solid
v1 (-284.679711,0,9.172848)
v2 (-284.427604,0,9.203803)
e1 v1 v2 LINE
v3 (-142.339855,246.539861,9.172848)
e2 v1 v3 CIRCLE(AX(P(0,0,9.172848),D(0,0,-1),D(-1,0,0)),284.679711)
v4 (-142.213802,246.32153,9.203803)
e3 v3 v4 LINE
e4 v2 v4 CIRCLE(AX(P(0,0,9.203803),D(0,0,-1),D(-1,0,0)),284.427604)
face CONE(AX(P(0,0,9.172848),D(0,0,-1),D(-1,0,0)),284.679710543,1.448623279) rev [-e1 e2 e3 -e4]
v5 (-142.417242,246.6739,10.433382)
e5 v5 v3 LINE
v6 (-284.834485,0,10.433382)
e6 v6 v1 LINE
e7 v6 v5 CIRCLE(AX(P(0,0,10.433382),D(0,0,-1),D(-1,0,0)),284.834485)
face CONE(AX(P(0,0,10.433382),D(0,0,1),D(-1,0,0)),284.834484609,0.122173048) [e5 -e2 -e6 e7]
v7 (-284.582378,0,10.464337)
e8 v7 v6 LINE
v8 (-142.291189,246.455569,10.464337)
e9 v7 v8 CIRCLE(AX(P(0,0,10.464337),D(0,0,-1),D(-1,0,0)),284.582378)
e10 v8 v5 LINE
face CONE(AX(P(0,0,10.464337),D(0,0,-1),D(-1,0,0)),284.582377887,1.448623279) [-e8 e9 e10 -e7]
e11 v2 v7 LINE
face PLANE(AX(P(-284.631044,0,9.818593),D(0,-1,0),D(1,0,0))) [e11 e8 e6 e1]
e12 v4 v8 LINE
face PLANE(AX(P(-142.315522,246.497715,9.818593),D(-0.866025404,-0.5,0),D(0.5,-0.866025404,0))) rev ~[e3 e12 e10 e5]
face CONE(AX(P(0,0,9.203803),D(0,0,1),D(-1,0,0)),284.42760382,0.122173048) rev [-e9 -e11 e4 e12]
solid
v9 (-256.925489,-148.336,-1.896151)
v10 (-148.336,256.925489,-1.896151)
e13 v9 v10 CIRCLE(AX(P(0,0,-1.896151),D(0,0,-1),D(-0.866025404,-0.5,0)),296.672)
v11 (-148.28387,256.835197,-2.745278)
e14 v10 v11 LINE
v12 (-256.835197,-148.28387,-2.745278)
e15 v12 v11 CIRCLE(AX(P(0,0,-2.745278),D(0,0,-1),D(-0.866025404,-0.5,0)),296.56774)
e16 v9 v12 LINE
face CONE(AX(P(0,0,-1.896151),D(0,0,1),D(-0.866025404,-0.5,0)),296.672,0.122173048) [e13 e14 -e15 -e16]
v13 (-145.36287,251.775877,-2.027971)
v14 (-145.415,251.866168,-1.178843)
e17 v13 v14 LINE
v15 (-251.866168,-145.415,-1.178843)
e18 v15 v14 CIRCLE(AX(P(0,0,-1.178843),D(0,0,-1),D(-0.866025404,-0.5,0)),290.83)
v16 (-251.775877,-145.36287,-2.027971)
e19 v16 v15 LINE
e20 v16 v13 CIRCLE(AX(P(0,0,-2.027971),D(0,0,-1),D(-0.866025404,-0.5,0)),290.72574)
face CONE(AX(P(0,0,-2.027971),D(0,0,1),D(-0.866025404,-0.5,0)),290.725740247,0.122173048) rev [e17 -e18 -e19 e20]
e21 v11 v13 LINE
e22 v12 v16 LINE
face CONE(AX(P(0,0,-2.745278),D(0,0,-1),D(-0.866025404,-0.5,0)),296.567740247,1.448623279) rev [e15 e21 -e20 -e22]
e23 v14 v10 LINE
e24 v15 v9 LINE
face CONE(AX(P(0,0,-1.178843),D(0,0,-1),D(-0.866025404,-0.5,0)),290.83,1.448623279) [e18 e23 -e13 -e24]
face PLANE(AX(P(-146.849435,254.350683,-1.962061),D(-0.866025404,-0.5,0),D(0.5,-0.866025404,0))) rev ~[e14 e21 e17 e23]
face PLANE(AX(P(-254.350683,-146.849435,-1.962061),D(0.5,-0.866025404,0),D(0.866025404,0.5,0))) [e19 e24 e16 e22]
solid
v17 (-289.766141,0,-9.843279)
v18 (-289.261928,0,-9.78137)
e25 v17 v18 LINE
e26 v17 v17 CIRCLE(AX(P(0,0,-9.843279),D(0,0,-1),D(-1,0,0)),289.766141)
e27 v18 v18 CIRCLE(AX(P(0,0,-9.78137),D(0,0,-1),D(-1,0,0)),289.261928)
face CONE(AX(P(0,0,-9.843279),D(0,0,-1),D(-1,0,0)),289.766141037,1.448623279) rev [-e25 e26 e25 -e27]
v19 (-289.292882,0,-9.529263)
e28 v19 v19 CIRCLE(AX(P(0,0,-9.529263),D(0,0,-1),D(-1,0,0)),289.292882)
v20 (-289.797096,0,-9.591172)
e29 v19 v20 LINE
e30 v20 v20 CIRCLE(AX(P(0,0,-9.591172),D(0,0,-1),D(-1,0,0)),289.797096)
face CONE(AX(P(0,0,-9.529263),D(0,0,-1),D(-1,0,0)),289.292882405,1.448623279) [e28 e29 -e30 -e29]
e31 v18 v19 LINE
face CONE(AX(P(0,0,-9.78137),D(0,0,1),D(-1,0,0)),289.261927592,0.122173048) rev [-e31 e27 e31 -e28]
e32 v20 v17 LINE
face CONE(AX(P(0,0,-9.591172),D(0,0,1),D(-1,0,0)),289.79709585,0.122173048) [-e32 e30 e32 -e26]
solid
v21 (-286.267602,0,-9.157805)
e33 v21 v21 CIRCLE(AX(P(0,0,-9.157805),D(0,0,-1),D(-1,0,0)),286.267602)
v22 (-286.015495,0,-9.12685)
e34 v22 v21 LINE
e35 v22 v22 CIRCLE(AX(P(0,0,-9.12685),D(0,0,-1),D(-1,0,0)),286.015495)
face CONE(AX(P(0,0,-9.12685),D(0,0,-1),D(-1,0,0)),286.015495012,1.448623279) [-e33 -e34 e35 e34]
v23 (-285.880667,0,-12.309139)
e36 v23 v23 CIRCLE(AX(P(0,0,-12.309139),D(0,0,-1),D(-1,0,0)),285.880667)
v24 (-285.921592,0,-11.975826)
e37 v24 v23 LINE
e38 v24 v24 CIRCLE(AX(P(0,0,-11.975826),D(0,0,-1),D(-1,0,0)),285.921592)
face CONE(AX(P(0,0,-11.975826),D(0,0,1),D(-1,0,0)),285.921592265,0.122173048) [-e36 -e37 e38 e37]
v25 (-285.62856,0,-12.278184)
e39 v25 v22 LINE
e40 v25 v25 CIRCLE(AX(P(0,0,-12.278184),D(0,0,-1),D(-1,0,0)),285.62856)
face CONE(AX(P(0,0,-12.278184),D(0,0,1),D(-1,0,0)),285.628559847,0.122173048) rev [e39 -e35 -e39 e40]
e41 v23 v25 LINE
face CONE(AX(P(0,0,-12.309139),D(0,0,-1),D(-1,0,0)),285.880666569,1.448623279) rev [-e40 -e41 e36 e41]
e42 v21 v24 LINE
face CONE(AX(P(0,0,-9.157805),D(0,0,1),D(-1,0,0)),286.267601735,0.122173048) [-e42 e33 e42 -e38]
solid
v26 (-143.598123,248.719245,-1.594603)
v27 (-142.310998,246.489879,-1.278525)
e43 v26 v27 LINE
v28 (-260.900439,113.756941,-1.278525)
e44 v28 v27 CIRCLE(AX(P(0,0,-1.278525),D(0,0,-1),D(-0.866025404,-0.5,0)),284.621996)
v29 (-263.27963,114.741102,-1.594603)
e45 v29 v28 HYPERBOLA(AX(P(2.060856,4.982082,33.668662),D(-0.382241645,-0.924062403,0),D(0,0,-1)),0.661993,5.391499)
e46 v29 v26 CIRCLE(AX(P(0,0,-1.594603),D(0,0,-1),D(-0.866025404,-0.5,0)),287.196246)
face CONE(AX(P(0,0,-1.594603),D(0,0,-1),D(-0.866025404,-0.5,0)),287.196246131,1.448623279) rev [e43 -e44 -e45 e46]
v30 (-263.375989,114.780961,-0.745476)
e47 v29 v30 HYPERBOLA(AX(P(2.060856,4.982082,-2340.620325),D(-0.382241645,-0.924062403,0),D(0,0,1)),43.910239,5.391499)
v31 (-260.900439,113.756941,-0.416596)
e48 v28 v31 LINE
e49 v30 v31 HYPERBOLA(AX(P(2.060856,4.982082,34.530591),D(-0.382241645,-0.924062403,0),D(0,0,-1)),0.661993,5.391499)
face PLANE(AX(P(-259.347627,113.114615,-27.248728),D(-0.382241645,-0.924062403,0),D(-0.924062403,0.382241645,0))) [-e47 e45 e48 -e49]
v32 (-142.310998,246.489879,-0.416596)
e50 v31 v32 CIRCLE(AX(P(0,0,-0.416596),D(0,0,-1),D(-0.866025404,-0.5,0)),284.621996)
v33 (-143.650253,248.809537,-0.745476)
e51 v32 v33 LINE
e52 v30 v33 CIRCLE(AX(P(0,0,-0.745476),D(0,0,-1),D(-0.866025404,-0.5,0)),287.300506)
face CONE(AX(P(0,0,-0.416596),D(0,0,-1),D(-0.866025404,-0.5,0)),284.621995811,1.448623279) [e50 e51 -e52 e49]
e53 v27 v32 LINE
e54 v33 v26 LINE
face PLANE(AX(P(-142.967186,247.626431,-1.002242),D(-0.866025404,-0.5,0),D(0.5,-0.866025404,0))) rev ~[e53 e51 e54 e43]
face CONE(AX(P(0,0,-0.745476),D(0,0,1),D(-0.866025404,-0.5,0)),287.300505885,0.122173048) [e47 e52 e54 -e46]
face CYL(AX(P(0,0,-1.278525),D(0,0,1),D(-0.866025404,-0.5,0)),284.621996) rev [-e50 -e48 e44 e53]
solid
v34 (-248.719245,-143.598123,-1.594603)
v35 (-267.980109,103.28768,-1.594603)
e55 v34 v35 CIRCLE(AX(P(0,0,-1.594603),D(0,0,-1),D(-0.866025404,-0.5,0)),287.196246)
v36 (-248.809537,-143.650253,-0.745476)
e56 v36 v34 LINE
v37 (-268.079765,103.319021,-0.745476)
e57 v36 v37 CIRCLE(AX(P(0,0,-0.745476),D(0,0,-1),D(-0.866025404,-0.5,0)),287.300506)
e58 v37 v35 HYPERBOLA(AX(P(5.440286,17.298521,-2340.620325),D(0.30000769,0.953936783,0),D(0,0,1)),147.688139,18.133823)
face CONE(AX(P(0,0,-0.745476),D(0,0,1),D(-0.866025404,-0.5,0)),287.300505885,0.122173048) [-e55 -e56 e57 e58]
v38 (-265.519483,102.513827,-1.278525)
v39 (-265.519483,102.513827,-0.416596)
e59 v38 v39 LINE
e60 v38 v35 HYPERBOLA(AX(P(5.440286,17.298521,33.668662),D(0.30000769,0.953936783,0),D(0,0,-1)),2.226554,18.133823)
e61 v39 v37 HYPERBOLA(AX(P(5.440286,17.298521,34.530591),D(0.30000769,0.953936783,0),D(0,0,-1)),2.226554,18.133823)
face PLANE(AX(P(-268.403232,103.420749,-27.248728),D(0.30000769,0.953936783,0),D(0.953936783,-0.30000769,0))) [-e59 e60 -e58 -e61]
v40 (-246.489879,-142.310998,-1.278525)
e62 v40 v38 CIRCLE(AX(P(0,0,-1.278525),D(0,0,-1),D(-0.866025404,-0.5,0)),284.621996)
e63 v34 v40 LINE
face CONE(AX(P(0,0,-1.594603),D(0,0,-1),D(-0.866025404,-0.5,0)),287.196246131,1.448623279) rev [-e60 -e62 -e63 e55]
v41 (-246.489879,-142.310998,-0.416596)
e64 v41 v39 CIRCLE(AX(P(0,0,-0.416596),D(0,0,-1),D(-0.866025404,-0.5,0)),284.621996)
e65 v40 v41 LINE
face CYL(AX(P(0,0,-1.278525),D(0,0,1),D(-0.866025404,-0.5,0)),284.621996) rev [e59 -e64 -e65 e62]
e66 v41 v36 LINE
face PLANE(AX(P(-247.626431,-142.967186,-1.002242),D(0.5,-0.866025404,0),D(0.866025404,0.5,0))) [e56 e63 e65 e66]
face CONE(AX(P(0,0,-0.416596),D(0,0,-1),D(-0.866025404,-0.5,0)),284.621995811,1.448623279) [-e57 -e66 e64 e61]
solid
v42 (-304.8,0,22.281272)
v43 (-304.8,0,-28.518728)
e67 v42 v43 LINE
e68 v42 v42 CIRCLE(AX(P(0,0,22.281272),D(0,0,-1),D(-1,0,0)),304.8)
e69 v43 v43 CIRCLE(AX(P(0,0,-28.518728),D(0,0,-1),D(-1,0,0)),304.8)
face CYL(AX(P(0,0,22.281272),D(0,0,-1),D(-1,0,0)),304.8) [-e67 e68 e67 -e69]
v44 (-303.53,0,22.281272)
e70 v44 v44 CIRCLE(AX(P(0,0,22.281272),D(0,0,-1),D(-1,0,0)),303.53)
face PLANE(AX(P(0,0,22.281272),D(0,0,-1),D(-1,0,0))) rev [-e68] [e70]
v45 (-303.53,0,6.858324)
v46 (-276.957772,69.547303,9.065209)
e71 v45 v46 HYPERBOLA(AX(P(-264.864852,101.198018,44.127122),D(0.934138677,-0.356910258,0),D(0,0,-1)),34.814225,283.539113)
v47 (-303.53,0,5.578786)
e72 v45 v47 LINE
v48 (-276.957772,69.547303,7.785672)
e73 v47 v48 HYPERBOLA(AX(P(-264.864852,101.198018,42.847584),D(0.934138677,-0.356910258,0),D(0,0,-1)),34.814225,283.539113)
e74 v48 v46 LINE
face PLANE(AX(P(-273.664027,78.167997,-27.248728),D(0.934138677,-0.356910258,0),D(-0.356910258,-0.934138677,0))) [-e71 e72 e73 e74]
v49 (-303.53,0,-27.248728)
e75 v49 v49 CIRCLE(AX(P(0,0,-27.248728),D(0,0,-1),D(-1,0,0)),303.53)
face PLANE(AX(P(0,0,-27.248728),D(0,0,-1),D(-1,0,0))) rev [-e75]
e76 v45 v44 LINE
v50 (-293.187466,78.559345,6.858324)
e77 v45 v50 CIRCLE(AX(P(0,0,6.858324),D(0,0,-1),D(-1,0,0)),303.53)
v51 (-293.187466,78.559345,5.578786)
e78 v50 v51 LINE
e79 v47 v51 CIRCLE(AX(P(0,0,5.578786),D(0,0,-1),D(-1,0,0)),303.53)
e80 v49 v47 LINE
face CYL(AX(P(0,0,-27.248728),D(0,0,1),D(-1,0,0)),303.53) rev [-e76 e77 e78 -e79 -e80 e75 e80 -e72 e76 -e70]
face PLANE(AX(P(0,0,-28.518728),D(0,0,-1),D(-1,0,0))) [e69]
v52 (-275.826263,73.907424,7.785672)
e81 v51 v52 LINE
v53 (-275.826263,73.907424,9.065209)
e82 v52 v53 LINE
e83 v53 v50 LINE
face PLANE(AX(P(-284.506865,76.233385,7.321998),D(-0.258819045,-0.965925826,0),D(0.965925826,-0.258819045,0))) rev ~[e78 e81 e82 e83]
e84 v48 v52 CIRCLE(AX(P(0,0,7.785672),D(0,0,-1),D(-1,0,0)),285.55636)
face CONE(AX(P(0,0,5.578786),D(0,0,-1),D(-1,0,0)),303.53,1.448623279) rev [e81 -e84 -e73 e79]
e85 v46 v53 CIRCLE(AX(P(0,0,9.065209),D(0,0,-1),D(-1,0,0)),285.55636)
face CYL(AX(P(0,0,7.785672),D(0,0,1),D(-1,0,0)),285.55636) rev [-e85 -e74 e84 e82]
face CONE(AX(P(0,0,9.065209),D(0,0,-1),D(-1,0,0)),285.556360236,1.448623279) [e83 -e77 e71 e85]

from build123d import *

# Parameters (mm, degrees)
F3_ANGLE_BACK = 30
F3_ANGLE      = 90
F5_ANGLE_BACK = 30
F5_ANGLE      = 90
F8_DEPTH      = 50.8
F9_ANGLE      = 60
F11_ANGLE     = 15
F12_DEPTH     = 871


# Not quite as in the source:
# - an extrude ends at something that could not be found from the text; its depth is read off the source's solid
# - a feature names something its author has since deleted; it is built from what else it names


with BuildPart() as f2:
    # F0 (on Front) → F2 (revolve)
    with BuildSketch(Plane.XZ):
        Polygon((-304.8, 22.2812721531), (-304.8, -3.1187278469), (-304.8, -28.5187278469), (0, -28.5187278469), (0, -27.2487278469), (-303.53, -27.2487278469), (-303.53, -4.0932331217), (-303.53, -2.7382071398), (-303.53, 5.5787864694), (-303.53, 6.8583239477), (-303.53, 22.2812721531), align=None)
    revolve(axis=Axis((0, 0, -10.9399985522), (0, 0, -1)))

    # F0 (on Front) → F11 (revolve)
    with BuildSketch(Plane.XZ):
        Polygon((-285.5563602362, 9.0652094139), (-303.53, 6.8583239477), (-303.53, 5.5787864694), (-285.5563602362, 7.7856719356), align=None)
    revolve(axis=Axis((0, 0, -10.9399985522), (0, 0, -1)), revolution_arc=F11_ANGLE)

    # F4 (on face) → F12 (cut, through all)
    with BuildSketch(Plane.XY.offset(-27.2487278469)):
        Polygon((-273.6640274525, 78.1679973006), (-303.53, 0), (-273.6640274525, -3.1685957219), align=None)
    extrude(amount=F12_DEPTH, mode=Mode.SUBTRACT)


with BuildPart() as f3:
    # F0 (on Front) → F3 (revolve)
    with BuildSketch(Plane.XZ, mode=Mode.PRIVATE) as f3_sk:
        Polygon((-290.83, -1.1788432163), (-296.672, -1.8961506211), (-296.5677402466, -2.7452781714), (-290.7257402466, -2.0279707666), align=None)
    revolve(f3_sk.sketch.rotate(Axis((0, 0, -10.9399985522), (0, 0, -1)), -F3_ANGLE_BACK), axis=Axis((0, 0, -10.9399985522), (0, 0, -1)), revolution_arc=F3_ANGLE)


with BuildPart() as f5:
    # F0 (on Front) → F5 (revolve)
    with BuildSketch(Plane.XZ, mode=Mode.PRIVATE) as f5_sk:
        Polygon((-284.6219958112, -1.2785251862), (-284.6219958112, -0.4165961479), (-287.3005058848, -0.7454758312), (-287.1962461314, -1.5946033814), align=None)
    revolve(f5_sk.sketch.rotate(Axis((0, 0, -10.9399985522), (0, 0, -1)), -F5_ANGLE_BACK), axis=Axis((0, 0, -10.9399985522), (0, 0, -1)), revolution_arc=F5_ANGLE)

    # F7 (on face) → F8 (cut)
    with BuildSketch(Plane.XY.offset(-27.2487278469)):
        Polygon((-263.6561095715, 114.8968338966), (-268.4032320976, 103.4207493067), (-263.9383698547, 102.0165755392), (-259.3476270111, 113.1146150174), align=None)
    extrude(amount=F8_DEPTH, mode=Mode.SUBTRACT)


with BuildPart() as f6:
    # F0 (on Front) → F6 (revolve)
    with BuildSketch(Plane.XZ):
        Polygon((-289.2928824048, -9.5292628156), (-289.7970958498, -9.5911724421), (-289.7661410366, -9.8432791646), (-289.2619275916, -9.7813695382), align=None)
    revolve(axis=Axis((0, 0, -10.9399985522), (0, 0, -1)))


with BuildPart() as f9:
    # F0 (on Front) → F9 (revolve)
    with BuildSketch(Plane.XZ):
        Polygon((-284.5823778866, 10.4643368874), (-284.8344846091, 10.4333820742), (-284.6797105429, 9.1728484616), (-284.4276038204, 9.2038032748), align=None)
    revolve(axis=Axis((0, 0, -10.9399985522), (0, 0, -1)), revolution_arc=F9_ANGLE)


with BuildPart() as f10:
    # F0 (on Front) → F10 (revolve)
    with BuildSketch(Plane.XZ):
        Polygon((-286.0154950121, -9.1268502437), (-286.2676017346, -9.1578050569), (-285.9215922653, -11.9758260426), (-285.8806665693, -12.3091390884), (-285.6285598468, -12.2781842752), align=None)
    revolve(axis=Axis((0, 0, -10.9399985522), (0, 0, -1)))


solid = Compound([f2.part, f3.part, f5.part, f6.part, f9.part, f10.part])
